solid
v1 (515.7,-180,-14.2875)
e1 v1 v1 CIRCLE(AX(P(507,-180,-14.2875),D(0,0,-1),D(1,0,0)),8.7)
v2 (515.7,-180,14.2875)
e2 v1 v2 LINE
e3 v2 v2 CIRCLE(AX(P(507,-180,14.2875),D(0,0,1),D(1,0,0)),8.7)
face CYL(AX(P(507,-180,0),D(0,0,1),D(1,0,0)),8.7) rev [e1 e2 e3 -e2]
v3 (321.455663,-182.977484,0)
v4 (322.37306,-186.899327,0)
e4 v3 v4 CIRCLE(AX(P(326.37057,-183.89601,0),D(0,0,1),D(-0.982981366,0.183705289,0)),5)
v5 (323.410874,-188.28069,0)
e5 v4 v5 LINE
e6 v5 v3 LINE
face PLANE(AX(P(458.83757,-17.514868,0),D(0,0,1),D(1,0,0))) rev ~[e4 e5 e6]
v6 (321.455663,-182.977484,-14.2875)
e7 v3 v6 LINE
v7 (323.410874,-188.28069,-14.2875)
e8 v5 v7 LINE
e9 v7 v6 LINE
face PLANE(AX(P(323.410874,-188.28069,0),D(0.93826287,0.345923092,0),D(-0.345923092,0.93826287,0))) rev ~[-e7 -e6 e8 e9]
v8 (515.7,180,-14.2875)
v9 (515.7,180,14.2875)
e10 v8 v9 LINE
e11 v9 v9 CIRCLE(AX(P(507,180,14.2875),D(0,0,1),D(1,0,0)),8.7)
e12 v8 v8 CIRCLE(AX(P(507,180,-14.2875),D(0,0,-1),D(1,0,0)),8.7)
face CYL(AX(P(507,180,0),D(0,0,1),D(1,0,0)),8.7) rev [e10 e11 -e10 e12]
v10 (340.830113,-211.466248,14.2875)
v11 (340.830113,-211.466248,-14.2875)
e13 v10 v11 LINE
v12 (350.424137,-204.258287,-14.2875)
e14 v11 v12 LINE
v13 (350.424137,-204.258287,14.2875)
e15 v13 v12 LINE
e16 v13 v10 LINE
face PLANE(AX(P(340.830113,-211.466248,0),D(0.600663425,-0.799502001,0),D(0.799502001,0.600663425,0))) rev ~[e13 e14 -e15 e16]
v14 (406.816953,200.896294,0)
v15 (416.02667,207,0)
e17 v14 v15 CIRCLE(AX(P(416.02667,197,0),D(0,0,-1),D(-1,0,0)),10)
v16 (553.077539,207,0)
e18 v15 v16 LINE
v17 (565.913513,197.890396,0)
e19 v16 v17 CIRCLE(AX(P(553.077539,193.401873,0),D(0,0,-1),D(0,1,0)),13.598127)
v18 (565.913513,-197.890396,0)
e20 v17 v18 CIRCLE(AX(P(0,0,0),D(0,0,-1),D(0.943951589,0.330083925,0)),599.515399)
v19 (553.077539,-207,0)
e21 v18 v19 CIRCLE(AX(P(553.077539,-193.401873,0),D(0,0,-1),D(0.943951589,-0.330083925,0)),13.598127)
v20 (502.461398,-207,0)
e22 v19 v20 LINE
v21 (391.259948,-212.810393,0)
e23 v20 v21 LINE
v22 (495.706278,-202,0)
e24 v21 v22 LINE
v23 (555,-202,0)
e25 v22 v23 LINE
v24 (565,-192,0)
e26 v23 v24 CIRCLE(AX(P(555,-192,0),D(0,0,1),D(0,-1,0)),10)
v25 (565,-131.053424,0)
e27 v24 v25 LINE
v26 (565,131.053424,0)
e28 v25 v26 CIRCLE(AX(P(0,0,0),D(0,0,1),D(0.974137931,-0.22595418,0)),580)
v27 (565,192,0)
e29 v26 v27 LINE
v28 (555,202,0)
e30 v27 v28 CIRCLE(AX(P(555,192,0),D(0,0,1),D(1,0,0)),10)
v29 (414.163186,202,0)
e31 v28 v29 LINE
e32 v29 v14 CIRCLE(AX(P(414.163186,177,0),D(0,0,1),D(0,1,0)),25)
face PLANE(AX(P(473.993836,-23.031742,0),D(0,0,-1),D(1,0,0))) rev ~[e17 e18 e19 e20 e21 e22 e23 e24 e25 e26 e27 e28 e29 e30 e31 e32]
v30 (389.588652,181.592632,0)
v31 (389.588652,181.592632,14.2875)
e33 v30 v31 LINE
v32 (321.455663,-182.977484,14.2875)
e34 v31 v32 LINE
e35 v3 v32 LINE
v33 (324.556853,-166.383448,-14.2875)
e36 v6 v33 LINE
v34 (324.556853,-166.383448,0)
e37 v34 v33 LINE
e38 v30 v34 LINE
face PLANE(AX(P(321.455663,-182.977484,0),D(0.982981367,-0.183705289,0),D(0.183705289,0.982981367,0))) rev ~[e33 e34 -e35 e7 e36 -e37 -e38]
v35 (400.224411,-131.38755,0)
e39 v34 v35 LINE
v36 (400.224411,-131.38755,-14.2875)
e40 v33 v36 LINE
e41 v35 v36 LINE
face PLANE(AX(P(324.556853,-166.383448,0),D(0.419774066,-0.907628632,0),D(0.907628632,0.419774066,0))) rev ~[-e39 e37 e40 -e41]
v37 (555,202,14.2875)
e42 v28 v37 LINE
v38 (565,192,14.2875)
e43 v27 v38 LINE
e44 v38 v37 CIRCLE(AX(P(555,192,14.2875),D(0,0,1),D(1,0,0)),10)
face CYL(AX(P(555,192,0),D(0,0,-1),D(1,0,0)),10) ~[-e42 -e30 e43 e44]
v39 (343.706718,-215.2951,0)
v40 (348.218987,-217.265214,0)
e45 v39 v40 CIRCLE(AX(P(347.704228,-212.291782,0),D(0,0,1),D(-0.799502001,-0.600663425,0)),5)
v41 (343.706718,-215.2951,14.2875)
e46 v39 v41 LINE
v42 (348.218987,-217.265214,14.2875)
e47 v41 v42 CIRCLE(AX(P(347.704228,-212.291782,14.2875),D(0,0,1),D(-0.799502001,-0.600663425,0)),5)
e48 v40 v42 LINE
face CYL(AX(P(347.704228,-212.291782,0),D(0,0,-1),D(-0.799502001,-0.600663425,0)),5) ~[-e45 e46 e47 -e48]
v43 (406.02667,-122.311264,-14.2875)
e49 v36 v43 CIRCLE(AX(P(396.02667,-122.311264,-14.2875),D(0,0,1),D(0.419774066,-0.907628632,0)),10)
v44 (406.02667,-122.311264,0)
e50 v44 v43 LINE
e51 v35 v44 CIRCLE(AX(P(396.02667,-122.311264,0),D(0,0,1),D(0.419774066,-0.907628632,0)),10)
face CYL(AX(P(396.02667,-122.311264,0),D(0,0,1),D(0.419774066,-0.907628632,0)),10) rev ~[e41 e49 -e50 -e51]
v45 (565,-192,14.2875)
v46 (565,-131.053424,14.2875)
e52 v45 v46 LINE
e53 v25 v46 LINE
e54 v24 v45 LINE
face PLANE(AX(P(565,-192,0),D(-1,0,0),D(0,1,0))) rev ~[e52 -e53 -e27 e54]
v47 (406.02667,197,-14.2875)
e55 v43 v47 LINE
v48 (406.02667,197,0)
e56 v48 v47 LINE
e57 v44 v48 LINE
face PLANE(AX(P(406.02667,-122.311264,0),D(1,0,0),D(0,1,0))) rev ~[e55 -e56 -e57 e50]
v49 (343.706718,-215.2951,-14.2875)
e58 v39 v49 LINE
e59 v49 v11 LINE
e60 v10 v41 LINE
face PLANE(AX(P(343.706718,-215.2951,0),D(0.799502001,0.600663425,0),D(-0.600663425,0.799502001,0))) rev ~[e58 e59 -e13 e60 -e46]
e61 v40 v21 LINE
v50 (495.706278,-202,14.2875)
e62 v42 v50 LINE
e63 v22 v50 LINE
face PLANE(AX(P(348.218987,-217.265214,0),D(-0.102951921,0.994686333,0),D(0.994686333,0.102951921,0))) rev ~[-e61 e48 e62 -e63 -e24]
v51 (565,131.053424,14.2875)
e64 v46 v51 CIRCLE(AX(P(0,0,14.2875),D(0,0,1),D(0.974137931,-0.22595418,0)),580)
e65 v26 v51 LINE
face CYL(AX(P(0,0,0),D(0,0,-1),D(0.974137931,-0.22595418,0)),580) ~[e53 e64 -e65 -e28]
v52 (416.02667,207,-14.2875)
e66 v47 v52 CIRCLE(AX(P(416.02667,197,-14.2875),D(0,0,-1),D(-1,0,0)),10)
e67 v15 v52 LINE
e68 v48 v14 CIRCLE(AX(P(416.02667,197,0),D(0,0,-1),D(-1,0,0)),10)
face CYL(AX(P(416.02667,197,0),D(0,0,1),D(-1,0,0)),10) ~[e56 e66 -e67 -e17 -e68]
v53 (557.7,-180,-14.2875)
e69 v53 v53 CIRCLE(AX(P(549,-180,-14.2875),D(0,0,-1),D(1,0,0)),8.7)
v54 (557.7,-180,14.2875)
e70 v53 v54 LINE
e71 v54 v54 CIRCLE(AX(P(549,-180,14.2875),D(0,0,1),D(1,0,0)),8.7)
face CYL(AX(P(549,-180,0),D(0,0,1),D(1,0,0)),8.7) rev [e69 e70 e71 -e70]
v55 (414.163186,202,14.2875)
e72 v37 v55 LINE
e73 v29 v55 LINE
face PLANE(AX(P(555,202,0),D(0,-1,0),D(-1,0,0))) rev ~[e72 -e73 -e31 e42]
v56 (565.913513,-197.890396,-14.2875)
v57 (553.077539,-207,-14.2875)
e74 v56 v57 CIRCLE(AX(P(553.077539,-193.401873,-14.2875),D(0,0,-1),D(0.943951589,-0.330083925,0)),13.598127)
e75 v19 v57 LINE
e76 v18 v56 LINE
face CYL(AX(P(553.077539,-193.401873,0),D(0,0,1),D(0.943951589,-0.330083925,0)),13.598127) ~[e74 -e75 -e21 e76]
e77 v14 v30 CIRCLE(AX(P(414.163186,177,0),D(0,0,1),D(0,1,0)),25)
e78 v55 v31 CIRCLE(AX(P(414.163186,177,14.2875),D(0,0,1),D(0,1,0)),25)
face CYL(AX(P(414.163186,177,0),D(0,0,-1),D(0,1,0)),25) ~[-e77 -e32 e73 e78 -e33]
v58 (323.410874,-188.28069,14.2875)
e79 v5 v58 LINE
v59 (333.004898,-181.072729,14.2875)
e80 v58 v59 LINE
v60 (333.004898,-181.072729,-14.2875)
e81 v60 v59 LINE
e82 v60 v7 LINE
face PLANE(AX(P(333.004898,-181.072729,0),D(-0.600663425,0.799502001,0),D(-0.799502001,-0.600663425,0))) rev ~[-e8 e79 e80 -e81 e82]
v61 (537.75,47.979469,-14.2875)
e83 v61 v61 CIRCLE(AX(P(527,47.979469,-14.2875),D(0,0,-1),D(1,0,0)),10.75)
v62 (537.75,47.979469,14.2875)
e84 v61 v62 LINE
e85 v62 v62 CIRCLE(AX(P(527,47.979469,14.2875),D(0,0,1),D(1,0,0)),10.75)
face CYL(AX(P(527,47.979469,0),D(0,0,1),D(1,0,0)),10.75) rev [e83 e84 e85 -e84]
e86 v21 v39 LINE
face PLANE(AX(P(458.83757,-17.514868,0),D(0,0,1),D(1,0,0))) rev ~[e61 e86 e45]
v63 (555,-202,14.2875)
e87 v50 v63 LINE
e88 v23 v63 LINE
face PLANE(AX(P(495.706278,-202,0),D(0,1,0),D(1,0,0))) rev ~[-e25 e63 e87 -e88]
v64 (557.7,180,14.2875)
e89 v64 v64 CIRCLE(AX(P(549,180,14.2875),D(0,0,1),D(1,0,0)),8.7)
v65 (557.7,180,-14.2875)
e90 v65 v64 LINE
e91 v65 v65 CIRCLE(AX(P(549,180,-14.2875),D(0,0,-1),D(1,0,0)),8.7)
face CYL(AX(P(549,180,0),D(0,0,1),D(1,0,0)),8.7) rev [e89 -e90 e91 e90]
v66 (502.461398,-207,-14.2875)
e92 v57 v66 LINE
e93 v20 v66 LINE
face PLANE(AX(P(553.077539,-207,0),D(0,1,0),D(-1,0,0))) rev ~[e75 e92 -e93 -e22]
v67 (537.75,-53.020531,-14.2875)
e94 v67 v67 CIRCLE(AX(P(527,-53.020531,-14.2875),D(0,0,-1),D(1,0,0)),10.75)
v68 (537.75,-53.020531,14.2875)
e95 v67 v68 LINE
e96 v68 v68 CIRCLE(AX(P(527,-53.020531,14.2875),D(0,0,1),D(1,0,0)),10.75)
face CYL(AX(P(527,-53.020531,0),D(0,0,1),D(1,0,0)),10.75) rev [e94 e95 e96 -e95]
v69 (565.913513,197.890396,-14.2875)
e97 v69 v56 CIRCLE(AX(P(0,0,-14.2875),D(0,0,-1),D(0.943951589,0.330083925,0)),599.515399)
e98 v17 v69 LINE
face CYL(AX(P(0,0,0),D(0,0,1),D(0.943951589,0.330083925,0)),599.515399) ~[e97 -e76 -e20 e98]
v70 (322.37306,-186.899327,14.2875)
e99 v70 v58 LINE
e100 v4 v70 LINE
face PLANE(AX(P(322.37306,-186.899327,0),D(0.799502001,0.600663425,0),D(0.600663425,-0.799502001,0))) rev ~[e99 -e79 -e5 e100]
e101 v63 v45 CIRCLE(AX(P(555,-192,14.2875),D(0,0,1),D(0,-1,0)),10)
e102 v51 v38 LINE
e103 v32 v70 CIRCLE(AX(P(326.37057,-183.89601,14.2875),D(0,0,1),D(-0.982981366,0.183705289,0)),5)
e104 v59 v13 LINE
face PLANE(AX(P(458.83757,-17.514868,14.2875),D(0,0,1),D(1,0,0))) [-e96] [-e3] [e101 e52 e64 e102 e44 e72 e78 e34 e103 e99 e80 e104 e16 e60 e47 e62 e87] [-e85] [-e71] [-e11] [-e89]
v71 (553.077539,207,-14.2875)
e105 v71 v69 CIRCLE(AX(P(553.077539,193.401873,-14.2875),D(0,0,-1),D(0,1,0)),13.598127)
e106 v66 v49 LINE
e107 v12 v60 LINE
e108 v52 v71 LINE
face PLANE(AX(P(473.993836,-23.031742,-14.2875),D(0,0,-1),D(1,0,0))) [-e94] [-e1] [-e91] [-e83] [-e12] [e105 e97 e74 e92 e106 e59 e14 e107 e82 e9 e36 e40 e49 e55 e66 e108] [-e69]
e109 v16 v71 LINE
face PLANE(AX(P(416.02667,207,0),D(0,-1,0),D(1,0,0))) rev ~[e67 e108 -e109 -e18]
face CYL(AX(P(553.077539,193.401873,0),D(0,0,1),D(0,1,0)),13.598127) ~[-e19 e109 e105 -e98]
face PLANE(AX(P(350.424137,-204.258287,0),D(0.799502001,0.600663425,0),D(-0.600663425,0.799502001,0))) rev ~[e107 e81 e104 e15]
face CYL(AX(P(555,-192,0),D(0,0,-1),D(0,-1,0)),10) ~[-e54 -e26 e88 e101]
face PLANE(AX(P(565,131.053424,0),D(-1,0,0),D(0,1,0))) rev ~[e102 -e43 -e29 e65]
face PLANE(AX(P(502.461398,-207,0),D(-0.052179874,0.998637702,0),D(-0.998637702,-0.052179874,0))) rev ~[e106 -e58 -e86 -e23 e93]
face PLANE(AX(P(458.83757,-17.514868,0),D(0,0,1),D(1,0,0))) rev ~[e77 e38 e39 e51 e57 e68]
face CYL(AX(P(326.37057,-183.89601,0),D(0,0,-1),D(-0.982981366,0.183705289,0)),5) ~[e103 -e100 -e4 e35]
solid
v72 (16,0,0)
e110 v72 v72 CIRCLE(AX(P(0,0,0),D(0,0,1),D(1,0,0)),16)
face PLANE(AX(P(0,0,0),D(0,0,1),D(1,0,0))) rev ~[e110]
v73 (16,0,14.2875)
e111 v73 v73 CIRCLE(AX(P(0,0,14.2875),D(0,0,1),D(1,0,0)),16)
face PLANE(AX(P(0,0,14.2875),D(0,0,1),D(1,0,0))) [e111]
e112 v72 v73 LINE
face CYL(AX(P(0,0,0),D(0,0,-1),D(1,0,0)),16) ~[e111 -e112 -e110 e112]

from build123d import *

# Parameters (mm, degrees)
F0_R     = 8.7
F0_R_2   = 10.75
F1_DEPTH = 14.2875
F2_R     = 8.7
F2_R_2   = 10.75
F3_DEPTH = 14.2875
F0_R_3   = 16
F4_DEPTH = 14.2875


# Not quite as in the source:
# - a length typed as a fraction of an inch, garbled in the dataset ("3 / 203.2 mm" for 3/8 in), is restored
# - a feature names something its author has since deleted; it is built from what else it names


with BuildPart() as f1:
    # F0 (on Top) → F1 (new body)
    with BuildSketch(Plane.XY):
        with BuildLine():
            Line((348.2189872385, -217.2652141408), (495.7062776099, -202))
            Line((495.7062776099, -202), (555, -202))
            ThreePointArc((555, -202), (562.0710678119, -199.0710678119), (565, -192))
            Line((565, -192), (565, -131.0534242208))
            ThreePointArc((565, -131.0534242208), (580, 0), (565, 131.0534242208))
            Line((565, 131.0534242208), (565, 192))
            ThreePointArc((565, 192), (562.0710678119, 199.0710678119), (555, 202))
            Line((555, 202), (414.1631860812, 202))
            ThreePointArc((414.1631860812, 202), (398.1915832415, 196.2329899582), (389.5886519187, 181.5926322185))
            Line((389.5886519187, 181.5926322185), (321.4556631787, -182.977483508))
            ThreePointArc((321.4556631787, -182.977483508), (321.501996532, -185.0348656396), (322.3730600039, -186.8993270748))
            Line((322.3730600039, -186.8993270748), (323.410873951, -188.2806902374))
            Line((323.410873951, -188.2806902374), (333.0048979686, -181.0727291422))
            Line((333.0048979686, -181.0727291422), (350.4241372821, -204.2582871847))
            Line((350.4241372821, -204.2582871847), (340.8301132645, -211.4662482799))
            Line((340.8301132645, -211.4662482799), (343.7067176257, -215.2950995966))
            ThreePointArc((343.7067176257, -215.2950995966), (345.7035463941, -216.8740607913), (348.2189872385, -217.2652141408))
        make_face()
        with Locations((507, -180)):
            Circle(F0_R, mode=Mode.SUBTRACT)
        with Locations((549, -180)):
            Circle(F0_R, mode=Mode.SUBTRACT)
        with Locations((527, -53.020531197)):
            Circle(F0_R_2, mode=Mode.SUBTRACT)
        with Locations((527, 47.979468803)):
            Circle(F0_R_2, mode=Mode.SUBTRACT)
        with Locations((507, 180)):
            Circle(F0_R, mode=Mode.SUBTRACT)
        with Locations((549, 180)):
            Circle(F0_R, mode=Mode.SUBTRACT)
    extrude(amount=F1_DEPTH)

    # F2 (on face) → F3 (join)
    with BuildSketch(Plane(origin=(0, 0, 0), x_dir=(1, 0, 0), z_dir=(0, 0, -1))):
        with BuildLine():
            Line((416.0266704213, -207), (553.0775391075, -207))
            ThreePointArc((553.0775391075, -207), (560.9475314042, -204.4911597734), (565.9135130702, -197.8903958685))
            ThreePointArc((565.9135130702, -197.8903958685), (599.5153985116, 0), (565.9135130702, 197.8903958685))
            ThreePointArc((565.9135130702, 197.8903958685), (560.9475314042, 204.4911597734), (553.0775391075, 207))
            Line((553.0775391075, 207), (502.4613982964, 207))
            Line((502.4613982964, 207), (343.7067176257, 215.2950995966))
            Line((343.7067176257, 215.2950995966), (340.8301132645, 211.4662482799))
            Line((340.8301132645, 211.4662482799), (350.4241372821, 204.2582871847))
            Line((350.4241372821, 204.2582871847), (333.0048979686, 181.0727291422))
            Line((333.0048979686, 181.0727291422), (323.410873951, 188.2806902374))
            Line((323.410873951, 188.2806902374), (321.4556631787, 182.977483508))
            Line((321.4556631787, 182.977483508), (324.5568533725, 166.3834475094))
            Line((324.5568533725, 166.3834475094), (400.2244110781, 131.3875502719))
            ThreePointArc((400.2244110781, 131.3875502719), (404.4521498311, 127.6974775298), (406.0266704213, 122.3112639511))
            Line((406.0266704213, 122.3112639511), (406.0266704213, -197))
            ThreePointArc((406.0266704213, -197), (408.9556026095, -204.0710678119), (416.0266704213, -207))
        make_face()
        with Locations((507, -180)):
            Circle(F2_R, mode=Mode.SUBTRACT)
        with Locations((549, -180)):
            Circle(F2_R, mode=Mode.SUBTRACT)
        with Locations((527, -47.979468803)):
            Circle(F2_R_2, mode=Mode.SUBTRACT)
        with Locations((527, 53.020531197)):
            Circle(F2_R_2, mode=Mode.SUBTRACT)
        with Locations((507, 180)):
            Circle(F2_R, mode=Mode.SUBTRACT)
        with Locations((549, 180)):
            Circle(F2_R, mode=Mode.SUBTRACT)
    extrude(amount=F3_DEPTH)


with BuildPart() as f4:
    # F0 (on Top) → F4 (new body)
    with BuildSketch(Plane.XY):
        Circle(F0_R_3)
    extrude(amount=F4_DEPTH)


solid = Compound([f1.part, f4.part])
